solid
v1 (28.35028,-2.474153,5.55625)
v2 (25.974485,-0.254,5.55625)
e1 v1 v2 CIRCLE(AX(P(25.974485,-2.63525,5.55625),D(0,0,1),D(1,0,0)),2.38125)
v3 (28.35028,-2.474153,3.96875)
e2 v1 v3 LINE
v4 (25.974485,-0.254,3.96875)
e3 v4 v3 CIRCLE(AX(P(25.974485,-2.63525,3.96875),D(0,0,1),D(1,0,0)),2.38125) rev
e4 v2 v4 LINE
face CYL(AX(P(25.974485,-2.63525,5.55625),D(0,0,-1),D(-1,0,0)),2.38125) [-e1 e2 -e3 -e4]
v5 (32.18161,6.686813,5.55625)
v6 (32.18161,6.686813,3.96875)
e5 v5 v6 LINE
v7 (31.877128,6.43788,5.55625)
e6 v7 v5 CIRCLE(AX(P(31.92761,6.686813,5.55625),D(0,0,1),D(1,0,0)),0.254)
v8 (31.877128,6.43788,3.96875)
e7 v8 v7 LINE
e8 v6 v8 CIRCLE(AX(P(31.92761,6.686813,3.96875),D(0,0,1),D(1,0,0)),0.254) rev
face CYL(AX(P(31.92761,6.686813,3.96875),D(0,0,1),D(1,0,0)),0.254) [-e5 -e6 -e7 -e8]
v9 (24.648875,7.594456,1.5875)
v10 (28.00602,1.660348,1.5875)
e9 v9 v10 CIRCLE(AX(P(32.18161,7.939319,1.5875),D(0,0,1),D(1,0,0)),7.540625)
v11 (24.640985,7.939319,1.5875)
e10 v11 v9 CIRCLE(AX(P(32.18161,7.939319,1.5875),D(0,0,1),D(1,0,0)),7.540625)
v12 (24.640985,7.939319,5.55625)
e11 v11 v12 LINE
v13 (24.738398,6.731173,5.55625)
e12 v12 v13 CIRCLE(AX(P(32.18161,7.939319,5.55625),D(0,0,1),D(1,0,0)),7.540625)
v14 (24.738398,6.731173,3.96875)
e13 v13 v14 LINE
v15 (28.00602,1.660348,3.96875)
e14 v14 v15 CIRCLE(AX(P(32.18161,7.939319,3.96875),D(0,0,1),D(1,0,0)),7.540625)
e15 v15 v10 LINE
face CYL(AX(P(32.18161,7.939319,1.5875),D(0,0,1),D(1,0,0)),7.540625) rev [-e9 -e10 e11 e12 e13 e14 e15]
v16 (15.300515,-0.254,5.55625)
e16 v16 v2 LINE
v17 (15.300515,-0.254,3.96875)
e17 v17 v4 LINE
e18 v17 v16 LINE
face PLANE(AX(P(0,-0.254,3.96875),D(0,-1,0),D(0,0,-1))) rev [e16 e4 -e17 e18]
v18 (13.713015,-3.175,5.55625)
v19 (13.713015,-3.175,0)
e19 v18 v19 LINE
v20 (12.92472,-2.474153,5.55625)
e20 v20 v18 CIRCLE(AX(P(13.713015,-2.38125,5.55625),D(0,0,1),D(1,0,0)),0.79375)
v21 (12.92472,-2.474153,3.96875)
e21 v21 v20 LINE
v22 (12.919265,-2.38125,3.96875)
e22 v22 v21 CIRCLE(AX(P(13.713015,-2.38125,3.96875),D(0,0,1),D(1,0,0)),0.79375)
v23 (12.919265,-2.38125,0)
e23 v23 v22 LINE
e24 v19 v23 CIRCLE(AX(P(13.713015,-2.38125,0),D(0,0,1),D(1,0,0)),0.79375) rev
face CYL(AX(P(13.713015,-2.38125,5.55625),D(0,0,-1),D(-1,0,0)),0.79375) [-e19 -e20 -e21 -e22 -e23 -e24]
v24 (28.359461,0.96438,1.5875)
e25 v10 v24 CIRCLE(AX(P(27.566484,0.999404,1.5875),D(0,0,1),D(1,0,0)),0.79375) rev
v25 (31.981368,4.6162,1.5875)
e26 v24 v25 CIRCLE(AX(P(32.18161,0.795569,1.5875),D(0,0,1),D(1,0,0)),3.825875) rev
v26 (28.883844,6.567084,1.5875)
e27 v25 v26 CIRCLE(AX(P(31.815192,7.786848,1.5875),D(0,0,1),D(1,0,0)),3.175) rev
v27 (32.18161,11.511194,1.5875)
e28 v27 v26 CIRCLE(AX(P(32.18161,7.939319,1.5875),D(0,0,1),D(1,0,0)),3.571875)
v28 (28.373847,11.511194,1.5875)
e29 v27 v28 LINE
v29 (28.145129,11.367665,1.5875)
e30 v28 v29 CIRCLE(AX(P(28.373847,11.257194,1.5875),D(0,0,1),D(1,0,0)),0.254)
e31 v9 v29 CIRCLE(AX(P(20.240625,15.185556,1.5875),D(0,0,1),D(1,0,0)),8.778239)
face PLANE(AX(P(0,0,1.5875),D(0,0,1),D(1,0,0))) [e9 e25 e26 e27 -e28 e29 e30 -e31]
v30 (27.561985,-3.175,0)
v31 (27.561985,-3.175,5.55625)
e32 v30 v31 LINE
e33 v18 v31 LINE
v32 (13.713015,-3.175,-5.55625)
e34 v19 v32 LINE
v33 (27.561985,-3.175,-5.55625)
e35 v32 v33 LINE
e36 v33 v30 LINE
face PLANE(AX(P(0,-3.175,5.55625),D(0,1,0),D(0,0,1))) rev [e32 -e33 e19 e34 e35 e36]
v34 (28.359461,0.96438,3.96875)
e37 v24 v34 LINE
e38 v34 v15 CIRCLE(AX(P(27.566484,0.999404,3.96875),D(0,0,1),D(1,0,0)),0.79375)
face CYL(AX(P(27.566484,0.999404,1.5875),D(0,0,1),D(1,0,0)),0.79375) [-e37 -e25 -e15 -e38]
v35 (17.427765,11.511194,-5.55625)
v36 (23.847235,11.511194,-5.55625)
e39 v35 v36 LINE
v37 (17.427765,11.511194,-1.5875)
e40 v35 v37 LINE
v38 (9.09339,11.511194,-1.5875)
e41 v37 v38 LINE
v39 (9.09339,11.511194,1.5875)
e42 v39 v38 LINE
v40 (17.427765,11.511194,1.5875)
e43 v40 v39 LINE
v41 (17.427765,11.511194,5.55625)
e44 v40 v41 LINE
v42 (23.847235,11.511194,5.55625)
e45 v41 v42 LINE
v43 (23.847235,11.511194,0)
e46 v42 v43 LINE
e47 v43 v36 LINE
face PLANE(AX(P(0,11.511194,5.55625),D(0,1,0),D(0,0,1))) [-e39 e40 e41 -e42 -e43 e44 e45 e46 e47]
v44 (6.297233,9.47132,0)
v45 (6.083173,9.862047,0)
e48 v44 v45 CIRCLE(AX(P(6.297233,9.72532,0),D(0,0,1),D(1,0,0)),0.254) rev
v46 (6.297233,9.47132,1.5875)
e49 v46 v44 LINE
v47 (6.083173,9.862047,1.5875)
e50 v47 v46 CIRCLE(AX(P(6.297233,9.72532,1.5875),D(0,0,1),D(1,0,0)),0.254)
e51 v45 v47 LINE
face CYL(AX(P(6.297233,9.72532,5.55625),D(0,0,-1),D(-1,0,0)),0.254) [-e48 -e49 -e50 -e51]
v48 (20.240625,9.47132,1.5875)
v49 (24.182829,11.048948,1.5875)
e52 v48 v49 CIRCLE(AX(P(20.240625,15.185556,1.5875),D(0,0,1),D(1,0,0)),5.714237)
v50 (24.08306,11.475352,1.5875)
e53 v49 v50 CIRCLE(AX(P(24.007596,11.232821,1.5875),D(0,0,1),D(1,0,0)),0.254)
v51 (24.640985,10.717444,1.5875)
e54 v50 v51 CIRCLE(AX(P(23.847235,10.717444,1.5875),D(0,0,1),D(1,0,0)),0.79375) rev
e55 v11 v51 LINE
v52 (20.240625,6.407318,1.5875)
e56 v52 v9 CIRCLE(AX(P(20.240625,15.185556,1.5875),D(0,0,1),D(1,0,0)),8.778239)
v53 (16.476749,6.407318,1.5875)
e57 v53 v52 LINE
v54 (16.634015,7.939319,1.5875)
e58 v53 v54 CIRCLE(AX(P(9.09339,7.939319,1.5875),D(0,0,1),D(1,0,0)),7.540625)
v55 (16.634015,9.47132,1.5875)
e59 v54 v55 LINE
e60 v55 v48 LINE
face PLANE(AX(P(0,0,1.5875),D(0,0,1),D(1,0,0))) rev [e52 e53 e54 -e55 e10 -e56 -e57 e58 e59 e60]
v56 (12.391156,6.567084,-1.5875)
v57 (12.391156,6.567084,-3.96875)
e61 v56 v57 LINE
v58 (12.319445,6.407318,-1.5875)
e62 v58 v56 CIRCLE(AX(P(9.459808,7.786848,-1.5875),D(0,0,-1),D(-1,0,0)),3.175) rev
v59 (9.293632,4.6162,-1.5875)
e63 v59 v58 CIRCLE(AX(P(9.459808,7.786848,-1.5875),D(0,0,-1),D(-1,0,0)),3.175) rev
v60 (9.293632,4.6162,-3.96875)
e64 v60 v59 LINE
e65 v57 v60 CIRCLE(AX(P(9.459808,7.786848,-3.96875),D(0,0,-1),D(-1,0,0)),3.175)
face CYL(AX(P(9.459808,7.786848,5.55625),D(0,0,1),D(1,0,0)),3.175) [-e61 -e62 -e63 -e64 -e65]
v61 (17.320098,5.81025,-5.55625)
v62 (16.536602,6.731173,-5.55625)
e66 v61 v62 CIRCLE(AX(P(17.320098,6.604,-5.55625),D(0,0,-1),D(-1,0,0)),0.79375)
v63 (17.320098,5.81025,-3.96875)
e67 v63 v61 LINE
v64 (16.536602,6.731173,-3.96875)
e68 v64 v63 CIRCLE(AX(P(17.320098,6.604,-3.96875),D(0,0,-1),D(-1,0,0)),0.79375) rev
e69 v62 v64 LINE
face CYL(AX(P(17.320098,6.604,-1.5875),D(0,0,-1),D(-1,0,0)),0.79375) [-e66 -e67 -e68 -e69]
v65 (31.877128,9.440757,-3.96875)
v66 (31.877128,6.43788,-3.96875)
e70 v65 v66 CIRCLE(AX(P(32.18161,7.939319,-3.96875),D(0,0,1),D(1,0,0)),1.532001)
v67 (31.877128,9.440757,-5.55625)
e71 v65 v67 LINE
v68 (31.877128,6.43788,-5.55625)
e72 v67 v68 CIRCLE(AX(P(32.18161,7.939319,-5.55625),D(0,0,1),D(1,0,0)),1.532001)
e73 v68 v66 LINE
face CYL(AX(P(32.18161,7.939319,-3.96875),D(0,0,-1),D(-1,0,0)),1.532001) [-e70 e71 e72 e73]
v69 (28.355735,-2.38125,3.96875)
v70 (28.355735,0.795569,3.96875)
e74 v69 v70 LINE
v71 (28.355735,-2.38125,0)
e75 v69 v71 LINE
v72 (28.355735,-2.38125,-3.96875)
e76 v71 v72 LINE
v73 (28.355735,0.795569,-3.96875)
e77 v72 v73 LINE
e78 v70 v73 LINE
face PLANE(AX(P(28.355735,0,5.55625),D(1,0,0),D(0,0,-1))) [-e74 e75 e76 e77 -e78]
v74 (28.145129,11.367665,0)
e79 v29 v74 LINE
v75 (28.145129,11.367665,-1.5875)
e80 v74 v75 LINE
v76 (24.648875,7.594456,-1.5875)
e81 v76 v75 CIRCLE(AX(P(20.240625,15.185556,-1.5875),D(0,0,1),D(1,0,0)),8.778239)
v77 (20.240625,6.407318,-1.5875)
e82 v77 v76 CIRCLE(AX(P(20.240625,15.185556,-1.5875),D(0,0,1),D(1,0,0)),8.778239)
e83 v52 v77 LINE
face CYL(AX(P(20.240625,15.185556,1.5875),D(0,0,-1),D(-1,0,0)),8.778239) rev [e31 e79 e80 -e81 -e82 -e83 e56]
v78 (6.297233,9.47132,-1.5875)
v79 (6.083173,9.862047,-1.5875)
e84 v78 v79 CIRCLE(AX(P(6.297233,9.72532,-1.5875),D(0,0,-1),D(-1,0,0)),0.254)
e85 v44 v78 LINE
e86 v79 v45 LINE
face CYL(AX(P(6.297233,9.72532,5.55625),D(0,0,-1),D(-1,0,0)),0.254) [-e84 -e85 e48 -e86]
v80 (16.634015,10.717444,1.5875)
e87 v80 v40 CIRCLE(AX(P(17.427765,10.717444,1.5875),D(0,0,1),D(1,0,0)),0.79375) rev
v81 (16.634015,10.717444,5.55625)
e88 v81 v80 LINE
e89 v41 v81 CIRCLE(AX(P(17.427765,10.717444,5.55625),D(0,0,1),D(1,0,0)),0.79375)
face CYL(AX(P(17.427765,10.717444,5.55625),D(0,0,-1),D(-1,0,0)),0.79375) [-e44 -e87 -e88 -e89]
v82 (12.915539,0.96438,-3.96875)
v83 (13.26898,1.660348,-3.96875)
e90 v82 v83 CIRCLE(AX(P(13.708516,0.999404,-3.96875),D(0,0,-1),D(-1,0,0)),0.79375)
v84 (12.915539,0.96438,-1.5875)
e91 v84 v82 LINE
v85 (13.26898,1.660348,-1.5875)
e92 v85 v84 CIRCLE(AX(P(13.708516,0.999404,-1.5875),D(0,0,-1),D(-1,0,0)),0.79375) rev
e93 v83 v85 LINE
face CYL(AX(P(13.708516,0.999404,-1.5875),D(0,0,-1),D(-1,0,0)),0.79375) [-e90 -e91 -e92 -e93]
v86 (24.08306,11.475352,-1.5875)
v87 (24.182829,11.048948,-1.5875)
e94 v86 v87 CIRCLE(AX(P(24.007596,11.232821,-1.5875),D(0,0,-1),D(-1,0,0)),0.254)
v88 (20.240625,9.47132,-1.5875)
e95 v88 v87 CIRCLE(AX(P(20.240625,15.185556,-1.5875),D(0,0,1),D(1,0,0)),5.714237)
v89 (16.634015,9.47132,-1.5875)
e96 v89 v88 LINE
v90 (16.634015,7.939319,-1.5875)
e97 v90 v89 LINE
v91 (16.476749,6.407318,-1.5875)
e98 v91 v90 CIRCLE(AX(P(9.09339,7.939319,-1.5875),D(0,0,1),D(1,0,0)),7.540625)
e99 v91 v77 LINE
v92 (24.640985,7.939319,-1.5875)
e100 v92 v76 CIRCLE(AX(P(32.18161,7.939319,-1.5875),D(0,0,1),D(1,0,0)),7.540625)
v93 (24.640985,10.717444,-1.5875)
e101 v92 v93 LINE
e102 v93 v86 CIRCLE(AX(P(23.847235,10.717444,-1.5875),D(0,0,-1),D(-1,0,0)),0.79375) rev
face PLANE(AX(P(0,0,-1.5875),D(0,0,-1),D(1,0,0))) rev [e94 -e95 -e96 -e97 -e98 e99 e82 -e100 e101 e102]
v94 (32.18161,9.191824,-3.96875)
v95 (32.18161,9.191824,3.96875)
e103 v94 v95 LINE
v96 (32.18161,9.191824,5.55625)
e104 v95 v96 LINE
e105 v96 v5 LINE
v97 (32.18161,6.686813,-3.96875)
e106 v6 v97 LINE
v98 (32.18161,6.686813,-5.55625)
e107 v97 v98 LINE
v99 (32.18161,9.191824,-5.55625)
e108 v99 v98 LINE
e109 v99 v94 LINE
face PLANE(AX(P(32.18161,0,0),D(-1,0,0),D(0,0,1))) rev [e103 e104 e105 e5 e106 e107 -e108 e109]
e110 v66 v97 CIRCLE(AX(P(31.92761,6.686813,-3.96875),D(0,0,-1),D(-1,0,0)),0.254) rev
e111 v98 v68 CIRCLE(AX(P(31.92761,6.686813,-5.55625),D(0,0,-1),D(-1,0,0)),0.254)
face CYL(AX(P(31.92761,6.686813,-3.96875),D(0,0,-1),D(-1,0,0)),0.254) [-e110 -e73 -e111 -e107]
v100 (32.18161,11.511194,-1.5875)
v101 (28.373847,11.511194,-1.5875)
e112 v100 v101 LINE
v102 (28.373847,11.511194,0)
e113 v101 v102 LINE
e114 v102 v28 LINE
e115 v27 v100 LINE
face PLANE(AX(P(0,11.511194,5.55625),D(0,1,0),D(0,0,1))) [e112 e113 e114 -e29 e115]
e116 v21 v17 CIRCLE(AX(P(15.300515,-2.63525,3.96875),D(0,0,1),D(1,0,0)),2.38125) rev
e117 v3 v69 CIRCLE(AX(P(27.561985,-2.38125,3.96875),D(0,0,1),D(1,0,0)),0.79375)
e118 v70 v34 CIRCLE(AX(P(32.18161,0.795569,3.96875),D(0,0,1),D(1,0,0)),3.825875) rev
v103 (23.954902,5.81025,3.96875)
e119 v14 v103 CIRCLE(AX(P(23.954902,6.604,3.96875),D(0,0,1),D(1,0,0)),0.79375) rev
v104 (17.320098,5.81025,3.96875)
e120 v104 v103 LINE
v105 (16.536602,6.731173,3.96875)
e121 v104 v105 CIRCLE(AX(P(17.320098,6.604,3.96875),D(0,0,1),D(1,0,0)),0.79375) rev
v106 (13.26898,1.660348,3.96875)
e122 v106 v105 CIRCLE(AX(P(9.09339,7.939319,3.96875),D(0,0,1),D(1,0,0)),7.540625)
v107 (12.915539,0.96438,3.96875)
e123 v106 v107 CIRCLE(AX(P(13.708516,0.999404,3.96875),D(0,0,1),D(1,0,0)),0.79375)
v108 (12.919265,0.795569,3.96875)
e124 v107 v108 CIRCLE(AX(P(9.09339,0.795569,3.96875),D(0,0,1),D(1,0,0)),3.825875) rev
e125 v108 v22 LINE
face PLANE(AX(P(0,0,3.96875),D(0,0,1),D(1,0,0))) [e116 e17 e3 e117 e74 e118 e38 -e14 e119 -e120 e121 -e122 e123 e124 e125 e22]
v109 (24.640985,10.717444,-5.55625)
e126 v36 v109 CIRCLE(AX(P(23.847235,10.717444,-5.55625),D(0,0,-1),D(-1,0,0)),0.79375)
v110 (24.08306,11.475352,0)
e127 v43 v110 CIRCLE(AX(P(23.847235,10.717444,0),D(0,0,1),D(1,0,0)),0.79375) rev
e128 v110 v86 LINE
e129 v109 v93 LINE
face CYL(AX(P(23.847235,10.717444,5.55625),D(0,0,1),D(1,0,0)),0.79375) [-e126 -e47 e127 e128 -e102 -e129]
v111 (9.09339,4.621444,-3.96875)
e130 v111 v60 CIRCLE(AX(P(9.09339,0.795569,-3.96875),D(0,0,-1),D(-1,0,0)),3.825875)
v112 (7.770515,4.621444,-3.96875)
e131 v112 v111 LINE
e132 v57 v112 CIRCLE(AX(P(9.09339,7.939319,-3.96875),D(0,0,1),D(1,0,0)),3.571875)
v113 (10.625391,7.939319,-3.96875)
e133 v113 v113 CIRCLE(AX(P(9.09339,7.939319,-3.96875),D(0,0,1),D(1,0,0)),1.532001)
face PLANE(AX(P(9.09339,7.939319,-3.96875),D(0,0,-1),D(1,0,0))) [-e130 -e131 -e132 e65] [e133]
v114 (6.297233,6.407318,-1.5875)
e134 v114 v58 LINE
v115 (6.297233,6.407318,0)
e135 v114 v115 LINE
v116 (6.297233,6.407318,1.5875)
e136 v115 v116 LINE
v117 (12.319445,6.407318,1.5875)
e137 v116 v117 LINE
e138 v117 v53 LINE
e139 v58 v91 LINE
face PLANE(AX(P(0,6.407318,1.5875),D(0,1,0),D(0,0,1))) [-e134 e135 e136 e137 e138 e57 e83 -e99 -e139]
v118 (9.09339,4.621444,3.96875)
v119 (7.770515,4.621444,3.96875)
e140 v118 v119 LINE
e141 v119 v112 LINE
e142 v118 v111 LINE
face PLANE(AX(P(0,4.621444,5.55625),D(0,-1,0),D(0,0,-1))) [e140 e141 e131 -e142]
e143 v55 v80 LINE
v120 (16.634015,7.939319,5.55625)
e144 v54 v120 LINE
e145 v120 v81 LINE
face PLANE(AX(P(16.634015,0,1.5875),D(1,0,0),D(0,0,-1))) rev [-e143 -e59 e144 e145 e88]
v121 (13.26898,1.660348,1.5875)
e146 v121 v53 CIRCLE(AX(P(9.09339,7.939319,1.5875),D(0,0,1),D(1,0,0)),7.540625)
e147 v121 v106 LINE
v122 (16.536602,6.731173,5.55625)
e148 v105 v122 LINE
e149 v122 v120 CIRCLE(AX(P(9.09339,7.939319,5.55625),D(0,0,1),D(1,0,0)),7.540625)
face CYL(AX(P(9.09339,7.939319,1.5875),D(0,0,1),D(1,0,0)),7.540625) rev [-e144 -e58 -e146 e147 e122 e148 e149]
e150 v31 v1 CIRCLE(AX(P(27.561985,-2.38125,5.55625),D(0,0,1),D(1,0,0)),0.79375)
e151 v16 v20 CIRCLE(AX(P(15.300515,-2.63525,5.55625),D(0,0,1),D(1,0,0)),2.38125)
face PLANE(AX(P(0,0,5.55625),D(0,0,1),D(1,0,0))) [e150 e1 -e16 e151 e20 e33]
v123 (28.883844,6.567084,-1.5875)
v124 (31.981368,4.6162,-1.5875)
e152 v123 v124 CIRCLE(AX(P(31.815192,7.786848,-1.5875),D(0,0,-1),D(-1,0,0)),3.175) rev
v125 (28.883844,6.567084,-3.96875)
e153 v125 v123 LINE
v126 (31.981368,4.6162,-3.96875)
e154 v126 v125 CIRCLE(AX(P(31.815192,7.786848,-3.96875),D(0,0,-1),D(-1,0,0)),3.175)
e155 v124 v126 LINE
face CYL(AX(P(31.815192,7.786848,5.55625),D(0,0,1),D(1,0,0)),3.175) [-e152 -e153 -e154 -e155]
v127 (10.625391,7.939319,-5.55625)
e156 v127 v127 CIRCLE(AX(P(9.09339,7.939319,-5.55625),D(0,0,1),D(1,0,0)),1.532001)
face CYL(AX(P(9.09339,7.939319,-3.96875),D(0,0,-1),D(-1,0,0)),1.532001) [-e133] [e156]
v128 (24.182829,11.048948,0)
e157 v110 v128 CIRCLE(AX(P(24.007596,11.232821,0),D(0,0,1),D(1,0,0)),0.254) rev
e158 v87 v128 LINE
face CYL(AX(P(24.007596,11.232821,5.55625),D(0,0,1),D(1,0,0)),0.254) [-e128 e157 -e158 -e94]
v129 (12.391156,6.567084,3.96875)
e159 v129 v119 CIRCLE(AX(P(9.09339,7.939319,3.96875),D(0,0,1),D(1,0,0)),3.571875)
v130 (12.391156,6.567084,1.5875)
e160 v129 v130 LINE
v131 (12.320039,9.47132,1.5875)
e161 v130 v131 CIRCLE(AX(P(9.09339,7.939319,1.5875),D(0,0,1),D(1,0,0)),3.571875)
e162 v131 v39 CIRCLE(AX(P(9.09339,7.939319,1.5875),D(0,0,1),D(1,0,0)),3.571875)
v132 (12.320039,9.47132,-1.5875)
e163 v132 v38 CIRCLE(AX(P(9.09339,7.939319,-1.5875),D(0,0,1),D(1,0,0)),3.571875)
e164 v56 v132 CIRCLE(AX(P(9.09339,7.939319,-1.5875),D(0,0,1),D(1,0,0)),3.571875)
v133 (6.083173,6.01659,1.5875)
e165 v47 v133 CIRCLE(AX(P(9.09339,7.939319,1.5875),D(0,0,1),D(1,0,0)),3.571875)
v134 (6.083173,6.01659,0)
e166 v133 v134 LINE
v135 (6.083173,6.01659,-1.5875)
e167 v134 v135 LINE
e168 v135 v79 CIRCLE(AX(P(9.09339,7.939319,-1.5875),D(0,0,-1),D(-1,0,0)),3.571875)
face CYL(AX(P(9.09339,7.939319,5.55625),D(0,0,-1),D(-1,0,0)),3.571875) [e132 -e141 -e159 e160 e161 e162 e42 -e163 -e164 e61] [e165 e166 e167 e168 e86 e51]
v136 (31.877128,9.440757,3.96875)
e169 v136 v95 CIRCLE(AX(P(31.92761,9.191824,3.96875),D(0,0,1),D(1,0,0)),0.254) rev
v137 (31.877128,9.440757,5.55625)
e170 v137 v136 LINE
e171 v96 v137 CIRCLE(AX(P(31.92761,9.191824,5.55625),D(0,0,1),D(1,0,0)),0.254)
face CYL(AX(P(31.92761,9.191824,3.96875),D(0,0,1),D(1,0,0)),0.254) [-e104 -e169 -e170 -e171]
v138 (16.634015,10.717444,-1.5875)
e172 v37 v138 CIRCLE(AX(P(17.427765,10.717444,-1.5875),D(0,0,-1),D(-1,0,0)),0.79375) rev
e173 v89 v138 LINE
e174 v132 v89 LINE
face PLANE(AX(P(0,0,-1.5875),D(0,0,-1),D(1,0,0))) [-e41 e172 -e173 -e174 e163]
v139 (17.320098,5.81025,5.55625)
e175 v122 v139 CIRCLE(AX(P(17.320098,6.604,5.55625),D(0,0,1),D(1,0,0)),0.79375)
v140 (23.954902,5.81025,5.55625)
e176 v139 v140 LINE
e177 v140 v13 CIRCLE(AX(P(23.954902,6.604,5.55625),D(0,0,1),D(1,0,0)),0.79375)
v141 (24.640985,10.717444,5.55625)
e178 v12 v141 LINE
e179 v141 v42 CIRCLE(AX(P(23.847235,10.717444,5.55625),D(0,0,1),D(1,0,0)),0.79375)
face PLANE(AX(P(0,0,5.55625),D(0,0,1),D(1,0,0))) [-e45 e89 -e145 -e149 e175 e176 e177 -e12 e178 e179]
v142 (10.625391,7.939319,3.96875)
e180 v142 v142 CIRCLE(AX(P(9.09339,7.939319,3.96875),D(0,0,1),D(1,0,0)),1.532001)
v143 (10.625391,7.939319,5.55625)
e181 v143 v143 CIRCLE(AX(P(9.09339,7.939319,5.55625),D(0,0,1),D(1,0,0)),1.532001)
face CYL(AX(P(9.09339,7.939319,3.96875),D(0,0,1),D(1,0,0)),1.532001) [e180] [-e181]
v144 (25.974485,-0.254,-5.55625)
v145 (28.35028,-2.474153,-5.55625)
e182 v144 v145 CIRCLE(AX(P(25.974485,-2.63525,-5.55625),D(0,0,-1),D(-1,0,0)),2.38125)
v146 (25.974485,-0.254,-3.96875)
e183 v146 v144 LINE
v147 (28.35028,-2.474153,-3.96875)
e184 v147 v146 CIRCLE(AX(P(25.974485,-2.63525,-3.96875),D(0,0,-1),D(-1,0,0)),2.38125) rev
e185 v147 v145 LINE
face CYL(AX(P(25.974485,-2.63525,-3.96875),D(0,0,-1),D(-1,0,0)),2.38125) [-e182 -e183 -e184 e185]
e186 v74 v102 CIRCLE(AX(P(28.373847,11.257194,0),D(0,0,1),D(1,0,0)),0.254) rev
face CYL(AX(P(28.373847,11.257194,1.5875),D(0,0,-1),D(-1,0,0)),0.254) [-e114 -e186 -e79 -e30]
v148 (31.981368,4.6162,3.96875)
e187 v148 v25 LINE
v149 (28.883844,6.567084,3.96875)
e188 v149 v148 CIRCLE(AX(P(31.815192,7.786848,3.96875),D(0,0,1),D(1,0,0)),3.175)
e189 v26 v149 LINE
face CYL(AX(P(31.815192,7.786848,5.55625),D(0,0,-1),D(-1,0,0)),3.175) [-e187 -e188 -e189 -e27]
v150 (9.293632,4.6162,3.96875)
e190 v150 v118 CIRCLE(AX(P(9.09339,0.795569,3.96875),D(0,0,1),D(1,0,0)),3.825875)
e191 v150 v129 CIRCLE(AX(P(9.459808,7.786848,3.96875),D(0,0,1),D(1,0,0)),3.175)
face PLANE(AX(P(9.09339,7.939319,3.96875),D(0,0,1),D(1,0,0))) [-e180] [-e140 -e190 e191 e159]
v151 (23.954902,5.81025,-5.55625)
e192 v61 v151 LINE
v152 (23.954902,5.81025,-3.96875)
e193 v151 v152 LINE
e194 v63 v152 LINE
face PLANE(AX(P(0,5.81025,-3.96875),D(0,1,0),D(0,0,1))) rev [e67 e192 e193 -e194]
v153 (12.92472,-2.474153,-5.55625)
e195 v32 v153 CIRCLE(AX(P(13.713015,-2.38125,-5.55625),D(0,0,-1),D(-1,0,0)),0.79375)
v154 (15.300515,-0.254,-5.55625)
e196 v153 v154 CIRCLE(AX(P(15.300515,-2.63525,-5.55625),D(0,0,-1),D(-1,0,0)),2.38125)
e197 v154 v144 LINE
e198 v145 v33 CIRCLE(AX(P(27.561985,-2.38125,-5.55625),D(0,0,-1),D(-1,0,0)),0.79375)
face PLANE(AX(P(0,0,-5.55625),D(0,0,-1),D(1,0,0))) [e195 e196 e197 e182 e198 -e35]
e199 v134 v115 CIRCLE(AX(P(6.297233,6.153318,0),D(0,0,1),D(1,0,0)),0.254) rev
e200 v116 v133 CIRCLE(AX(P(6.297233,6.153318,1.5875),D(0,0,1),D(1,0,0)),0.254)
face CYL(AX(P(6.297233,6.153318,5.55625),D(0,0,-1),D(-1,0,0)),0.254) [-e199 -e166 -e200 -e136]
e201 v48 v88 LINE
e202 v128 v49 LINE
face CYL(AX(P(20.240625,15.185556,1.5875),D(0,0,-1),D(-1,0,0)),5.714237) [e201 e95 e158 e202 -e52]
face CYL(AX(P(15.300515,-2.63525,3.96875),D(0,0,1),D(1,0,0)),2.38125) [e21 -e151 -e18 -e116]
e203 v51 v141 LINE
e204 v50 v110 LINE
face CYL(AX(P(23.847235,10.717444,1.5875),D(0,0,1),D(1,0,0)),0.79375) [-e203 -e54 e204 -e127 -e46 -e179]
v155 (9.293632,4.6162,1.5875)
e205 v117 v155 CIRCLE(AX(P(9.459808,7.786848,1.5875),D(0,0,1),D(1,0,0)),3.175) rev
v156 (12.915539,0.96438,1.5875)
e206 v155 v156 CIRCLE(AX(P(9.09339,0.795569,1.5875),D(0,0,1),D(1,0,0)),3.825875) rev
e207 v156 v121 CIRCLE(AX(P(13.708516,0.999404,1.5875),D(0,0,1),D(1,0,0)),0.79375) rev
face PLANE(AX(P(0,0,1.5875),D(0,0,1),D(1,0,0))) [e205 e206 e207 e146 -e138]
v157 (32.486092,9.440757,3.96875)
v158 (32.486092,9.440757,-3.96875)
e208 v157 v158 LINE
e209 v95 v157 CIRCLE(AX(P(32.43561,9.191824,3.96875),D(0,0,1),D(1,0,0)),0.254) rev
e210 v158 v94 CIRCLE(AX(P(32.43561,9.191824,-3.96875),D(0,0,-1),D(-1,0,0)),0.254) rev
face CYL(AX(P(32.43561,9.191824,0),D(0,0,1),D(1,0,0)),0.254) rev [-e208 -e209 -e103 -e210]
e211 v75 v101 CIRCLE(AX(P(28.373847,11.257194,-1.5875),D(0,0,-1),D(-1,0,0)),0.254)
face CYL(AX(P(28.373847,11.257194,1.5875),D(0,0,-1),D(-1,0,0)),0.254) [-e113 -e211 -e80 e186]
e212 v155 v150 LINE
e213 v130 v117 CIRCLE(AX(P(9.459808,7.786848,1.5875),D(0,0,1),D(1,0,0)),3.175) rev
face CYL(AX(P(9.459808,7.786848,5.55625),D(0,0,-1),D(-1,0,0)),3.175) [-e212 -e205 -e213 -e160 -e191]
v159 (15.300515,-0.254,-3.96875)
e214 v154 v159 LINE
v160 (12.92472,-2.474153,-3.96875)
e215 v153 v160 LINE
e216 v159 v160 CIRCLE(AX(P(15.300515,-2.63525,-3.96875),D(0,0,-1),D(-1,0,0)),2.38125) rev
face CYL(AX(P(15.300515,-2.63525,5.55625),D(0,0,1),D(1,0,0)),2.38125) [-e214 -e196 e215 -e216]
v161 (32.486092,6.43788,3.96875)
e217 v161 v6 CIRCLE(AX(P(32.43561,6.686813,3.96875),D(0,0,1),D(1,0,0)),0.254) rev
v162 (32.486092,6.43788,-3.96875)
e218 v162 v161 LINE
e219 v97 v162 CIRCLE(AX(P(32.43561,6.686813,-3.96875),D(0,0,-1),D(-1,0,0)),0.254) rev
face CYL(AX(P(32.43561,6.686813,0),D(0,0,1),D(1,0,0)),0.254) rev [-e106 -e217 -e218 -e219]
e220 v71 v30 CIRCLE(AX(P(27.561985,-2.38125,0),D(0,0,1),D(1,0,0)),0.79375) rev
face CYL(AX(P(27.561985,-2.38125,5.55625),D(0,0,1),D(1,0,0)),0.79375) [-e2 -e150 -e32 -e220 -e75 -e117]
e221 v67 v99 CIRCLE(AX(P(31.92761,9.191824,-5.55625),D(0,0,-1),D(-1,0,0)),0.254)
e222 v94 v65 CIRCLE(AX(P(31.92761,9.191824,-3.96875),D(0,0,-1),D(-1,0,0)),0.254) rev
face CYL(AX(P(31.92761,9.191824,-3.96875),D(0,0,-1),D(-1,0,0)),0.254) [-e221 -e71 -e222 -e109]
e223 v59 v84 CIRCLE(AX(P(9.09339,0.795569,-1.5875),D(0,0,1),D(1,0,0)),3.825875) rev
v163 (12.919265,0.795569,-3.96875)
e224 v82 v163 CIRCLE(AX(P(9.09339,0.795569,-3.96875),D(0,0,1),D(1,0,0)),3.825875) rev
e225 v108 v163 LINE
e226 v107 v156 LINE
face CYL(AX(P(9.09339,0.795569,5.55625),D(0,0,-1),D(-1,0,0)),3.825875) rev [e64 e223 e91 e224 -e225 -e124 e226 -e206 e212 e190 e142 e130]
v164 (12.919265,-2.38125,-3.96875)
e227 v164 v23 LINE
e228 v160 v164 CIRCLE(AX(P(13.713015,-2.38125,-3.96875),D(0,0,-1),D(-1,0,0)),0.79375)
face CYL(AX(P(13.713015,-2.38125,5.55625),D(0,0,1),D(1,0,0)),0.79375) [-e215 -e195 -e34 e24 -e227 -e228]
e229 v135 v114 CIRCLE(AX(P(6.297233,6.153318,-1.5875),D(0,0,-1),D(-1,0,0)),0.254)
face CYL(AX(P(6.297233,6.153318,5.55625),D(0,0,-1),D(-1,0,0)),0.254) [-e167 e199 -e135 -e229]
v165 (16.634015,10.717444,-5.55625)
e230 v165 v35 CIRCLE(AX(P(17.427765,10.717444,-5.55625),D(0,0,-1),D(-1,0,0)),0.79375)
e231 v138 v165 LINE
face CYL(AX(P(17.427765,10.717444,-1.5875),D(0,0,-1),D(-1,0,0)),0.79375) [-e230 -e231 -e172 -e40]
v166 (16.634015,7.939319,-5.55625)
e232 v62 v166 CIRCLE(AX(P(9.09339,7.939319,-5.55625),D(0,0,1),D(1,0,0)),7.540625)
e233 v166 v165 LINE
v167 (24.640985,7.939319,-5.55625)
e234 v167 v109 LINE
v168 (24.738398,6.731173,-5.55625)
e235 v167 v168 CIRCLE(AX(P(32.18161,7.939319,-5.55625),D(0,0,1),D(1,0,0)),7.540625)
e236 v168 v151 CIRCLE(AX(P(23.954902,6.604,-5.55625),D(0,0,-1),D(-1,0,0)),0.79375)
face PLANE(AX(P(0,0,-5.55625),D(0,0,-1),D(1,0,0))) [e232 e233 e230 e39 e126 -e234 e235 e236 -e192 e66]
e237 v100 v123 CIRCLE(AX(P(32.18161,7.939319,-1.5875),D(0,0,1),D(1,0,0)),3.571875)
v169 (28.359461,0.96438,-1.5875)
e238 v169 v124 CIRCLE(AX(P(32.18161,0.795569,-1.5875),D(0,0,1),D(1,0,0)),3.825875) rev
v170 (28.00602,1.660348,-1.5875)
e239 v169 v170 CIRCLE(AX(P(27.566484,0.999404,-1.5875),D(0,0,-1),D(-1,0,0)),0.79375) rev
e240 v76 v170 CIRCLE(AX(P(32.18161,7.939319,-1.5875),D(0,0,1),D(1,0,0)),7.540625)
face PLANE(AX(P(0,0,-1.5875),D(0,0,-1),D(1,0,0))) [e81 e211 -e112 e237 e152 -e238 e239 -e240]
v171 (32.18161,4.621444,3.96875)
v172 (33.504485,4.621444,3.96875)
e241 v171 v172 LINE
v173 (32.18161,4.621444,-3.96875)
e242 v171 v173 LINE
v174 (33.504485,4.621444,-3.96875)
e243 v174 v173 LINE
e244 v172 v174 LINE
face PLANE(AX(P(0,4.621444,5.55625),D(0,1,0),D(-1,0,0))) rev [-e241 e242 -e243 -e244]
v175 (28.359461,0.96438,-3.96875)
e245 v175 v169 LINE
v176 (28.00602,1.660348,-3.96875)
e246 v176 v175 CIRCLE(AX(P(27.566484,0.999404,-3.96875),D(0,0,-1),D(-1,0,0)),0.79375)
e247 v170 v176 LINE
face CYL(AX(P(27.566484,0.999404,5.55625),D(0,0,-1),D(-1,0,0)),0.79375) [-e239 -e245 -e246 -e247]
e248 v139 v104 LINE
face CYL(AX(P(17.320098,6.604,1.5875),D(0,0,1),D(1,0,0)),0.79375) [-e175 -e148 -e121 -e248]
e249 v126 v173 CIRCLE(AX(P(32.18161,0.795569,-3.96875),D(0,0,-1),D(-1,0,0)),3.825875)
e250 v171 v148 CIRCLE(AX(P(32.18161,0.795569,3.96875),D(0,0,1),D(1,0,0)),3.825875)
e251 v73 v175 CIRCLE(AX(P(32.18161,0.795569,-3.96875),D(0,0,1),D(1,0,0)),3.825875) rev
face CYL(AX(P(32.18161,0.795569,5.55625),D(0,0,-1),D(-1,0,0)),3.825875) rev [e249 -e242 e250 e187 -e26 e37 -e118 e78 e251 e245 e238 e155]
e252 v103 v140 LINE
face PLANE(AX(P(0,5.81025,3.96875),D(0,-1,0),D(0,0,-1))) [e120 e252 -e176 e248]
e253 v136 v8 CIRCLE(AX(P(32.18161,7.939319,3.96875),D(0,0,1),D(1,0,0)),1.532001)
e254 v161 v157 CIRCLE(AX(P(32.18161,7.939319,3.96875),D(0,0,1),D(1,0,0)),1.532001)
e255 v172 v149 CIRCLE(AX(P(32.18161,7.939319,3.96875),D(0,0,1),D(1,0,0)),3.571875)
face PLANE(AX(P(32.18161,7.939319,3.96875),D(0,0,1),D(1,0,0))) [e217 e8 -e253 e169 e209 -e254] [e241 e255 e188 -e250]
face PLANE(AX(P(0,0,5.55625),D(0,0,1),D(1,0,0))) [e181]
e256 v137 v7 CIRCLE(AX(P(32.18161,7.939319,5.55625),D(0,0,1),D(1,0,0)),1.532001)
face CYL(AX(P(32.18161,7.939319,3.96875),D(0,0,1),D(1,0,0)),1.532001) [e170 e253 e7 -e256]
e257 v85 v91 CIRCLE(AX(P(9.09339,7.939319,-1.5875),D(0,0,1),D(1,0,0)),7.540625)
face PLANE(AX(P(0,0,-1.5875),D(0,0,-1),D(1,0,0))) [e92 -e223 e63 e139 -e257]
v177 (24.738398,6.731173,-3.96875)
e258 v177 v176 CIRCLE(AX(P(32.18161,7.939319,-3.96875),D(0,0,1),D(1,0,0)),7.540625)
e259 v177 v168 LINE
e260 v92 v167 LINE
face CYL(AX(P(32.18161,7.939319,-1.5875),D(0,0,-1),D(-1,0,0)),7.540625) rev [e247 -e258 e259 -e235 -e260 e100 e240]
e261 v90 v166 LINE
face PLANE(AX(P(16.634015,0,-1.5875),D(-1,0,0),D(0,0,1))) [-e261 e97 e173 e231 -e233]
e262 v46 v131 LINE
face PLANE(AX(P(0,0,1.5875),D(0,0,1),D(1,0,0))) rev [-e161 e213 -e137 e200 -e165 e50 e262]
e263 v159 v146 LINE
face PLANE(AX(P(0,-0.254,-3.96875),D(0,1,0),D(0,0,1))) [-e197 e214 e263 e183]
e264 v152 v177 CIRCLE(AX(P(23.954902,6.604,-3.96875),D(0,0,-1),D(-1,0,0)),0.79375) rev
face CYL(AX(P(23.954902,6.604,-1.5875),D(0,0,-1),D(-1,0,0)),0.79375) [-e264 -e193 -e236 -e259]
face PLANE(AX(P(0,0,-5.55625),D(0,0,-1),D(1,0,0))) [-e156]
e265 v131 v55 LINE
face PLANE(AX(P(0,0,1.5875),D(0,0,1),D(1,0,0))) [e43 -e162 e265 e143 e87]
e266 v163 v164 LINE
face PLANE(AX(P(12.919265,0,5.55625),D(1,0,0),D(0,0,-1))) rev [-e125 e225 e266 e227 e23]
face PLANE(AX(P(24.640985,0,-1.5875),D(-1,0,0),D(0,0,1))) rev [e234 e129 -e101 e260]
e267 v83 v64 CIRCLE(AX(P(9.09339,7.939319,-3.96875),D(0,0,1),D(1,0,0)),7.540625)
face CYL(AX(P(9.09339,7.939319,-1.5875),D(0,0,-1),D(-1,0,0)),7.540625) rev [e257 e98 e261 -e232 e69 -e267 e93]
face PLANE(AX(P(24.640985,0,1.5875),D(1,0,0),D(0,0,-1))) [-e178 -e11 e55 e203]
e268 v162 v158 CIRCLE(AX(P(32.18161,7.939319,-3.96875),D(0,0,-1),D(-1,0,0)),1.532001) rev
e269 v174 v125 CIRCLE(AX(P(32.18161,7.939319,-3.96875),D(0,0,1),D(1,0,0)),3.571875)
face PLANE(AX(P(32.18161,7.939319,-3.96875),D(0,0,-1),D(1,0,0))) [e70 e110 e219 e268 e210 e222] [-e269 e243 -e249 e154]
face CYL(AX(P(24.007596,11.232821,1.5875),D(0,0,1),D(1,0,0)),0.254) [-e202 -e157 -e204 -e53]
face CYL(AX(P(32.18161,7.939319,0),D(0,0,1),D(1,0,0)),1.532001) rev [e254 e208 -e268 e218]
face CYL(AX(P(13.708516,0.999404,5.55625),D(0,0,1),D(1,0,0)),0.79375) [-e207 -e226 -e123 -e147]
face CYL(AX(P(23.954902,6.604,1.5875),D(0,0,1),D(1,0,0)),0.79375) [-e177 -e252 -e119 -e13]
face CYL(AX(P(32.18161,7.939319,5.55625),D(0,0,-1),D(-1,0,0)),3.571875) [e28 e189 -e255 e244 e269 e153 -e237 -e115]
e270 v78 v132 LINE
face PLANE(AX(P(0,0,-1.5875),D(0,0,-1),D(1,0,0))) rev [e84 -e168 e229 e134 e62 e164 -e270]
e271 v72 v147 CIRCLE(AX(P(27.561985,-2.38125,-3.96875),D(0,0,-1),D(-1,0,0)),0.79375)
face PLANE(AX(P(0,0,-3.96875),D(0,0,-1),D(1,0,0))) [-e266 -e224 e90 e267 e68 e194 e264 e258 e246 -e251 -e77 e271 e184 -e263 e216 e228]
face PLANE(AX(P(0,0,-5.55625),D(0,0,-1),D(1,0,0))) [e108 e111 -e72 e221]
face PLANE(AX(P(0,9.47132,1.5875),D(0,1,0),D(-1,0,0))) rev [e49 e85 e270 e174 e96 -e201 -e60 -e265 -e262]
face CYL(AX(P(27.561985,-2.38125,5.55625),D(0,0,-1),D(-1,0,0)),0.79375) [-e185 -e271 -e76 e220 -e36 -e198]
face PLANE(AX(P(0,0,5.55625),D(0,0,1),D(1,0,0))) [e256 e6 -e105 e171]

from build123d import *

# Parameters (mm, degrees)
BOSS_EXTRUDE1_DEPTH = 5.55625
CUT_EXTRUDE1_DEPTH  = 1.5875
CUT_EXTRUDE3_START  = -1.5875
SKETCH5_R           = 3.571875
SKETCH5_R_2         = 1.532001
CUT_EXTRUDE3_DEPTH  = 1.5875
CUT_EXTRUDE4_START  = -3.96875
CUT_EXTRUDE4_DEPTH  = 3.96875
CUT_EXTRUDE5_DEPTH  = 38.96960889
FILLET1_R           = 3.175
FILLET4_R           = 2.38125
FILLET2_R           = 0.79375
FILLET3_R           = 0.254
FILLET5_R           = 0.254
MIRROR1_START       = -3.96875
MIRROR1_DEPTH       = 3.96875
MIRROR1_START_2     = -5.55625
MIRROR1_2_OUTLINE_R = 1.532001
MIRROR1_2_DEPTH     = 3.96875
MIRROR1_START_3     = -1.5875
MIRROR1_3_DEPTH     = 1.5875
MIRROR1_4_DEPTH     = 2.38125


# Read off the part's stored shape, not the designer's step: Cut-Extrude4, Mirror1
with BuildPart() as part:
    # Sketch2 → Boss-Extrude1 (new body)
    with BuildSketch(Plane.XY):
        with BuildLine():
            Line((32.181610271, 11.511193514), (9.093389729, 11.511193514))
            ThreePointArc((9.093389729, 11.511193514), (5.585589436, 8.612837723), (7.770515396, 4.621443514))
            Line((7.770515396, 4.621443514), (9.093389729, 4.621443514))
            ThreePointArc((9.093389729, 4.621443514), (11.798691885, 3.500870671), (12.919264729, 0.795568514))
            Line((12.919264729, 0.795568514), (12.919264729, -3.175))
            Line((12.919264729, -3.175), (28.355735271, -3.175))
            Line((28.355735271, -3.175), (28.355735271, 0.795568514))
            ThreePointArc((28.355735271, 0.795568514), (29.476308115, 3.500870671), (32.181610271, 4.621443514))
            Line((32.181610271, 4.621443514), (33.504484604, 4.621443514))
            ThreePointArc((33.504484604, 4.621443514), (35.689410564, 8.612837723), (32.181610271, 11.511193514))
        make_face()
    extrude(amount=BOSS_EXTRUDE1_DEPTH)

    # Sketch3 → Cut-Extrude1 (cut)
    with BuildSketch(Plane.XY):
        with BuildLine():
            Line((13.576919222, 9.471319514), (5.521514729, 9.471319514))
            Line((5.521514729, 9.471319514), (5.521514729, 6.407317514))
            Line((5.521514729, 6.407317514), (20.240625, 6.407317514))
            ThreePointArc((20.240625, 6.407317514), (16.573436603, 7.21001835), (13.576919222, 9.471319514))
        make_face()
        with BuildLine():
            Line((20.240625, 9.471319514), (13.576919222, 9.471319514))
            ThreePointArc((13.576919222, 9.471319514), (16.573436603, 7.21001835), (20.240625, 6.407317514))
            ThreePointArc((20.240625, 6.407317514), (24.973649547, 7.792589705), (28.212860271, 11.511193514))
            Line((28.212860271, 11.511193514), (24.616874597, 11.511193514))
            ThreePointArc((24.616874597, 11.511193514), (22.654783573, 10.0063343), (20.240625, 9.471319514))
        make_face()
    extrude(amount=CUT_EXTRUDE1_DEPTH, mode=Mode.SUBTRACT)

    # Sketch5 → Cut-Extrude3 (cut)
    # profile 1 of 3: a face of its own
    with BuildSketch(Plane.XY.offset(5.55625).offset(CUT_EXTRUDE3_START)):
        with BuildLine():
            Line((12.919264729, 0.795568514), (12.919264729, -0.254))
            Line((12.919264729, -0.254), (28.355735271, -0.254))
            Line((28.355735271, -0.254), (28.355735271, 0.795568514))
            ThreePointArc((28.355735271, 0.795568514), (28.368258733, 1.10487348), (28.405747131, 1.412153514))
            ThreePointArc((28.405747131, 1.412153514), (26.253788464, 3.278636804), (24.947794359, 5.81025))
            Line((24.947794359, 5.81025), (16.327205641, 5.81025))
            ThreePointArc((16.327205641, 5.81025), (15.021211536, 3.278636804), (12.869252869, 1.412153514))
            ThreePointArc((12.869252869, 1.412153514), (12.906741267, 1.10487348), (12.919264729, 0.795568514))
        make_face()
    # profile 2 of 3: a face of its own
    with BuildSketch(Plane.XY.offset(5.55625).offset(CUT_EXTRUDE3_START)):
        with Locations((9.093389729, 7.939318514)):
            Circle(SKETCH5_R)
        with Locations((9.093389729, 7.939318514)):
            Circle(SKETCH5_R_2, mode=Mode.SUBTRACT)
    # profile 3 of 3: a face of its own
    with BuildSketch(Plane.XY.offset(5.55625).offset(CUT_EXTRUDE3_START)):
        with Locations((32.181610271, 7.939318514)):
            Circle(SKETCH5_R)
        with Locations((32.181610271, 7.939318514)):
            Circle(SKETCH5_R_2, mode=Mode.SUBTRACT)
    extrude(amount=CUT_EXTRUDE3_DEPTH, mode=Mode.SUBTRACT)

    # Cut-Extrude4 outline → Cut-Extrude4 (cut)
    with BuildSketch(Plane.XY.offset(5.55625).offset(CUT_EXTRUDE4_START)):
        with BuildLine():
            Line((16.634014729, 11.511193514), (9.093389729, 11.511193514))
            ThreePointArc((9.093389729, 11.511193514), (12.632233106, 8.42396123), (10.053711502, 4.49895907))
            ThreePointArc((10.053711502, 4.49895907), (11.9200404, 3.373817047), (12.869252869, 1.412153514))
            ThreePointArc((12.869252869, 1.412153514), (15.625364674, 4.171782357), (16.634014729, 7.939318514))
            Line((16.634014729, 7.939318514), (16.634014729, 11.511193514))
        make_face()
        with BuildLine():
            Line((32.181610271, 11.511193514), (24.640985271, 11.511193514))
            Line((24.640985271, 11.511193514), (24.640985271, 7.939318514))
            ThreePointArc((24.640985271, 7.939318514), (25.649635326, 4.171782357), (28.405747131, 1.412153514))
            ThreePointArc((28.405747131, 1.412153514), (29.3549596, 3.373817047), (31.221288498, 4.49895907))
            ThreePointArc((31.221288498, 4.49895907), (28.642766894, 8.42396123), (32.181610271, 11.511193514))
        make_face()
    extrude(amount=CUT_EXTRUDE4_DEPTH, mode=Mode.SUBTRACT)

    # Sketch5<4> → Cut-Extrude5 (cut, through all)
    with BuildSketch(Plane.XY.offset(5.55625)):
        with BuildLine():
            ThreePointArc((33.713611271, 7.939318514), (33.264898567, 9.02260681), (32.181610271, 9.471319514))
            Line((32.181610271, 9.471319514), (32.181610271, 6.407317514))
            ThreePointArc((32.181610271, 6.407317514), (33.264898567, 6.856030218), (33.713611271, 7.939318514))
        make_face()
    extrude(amount=-CUT_EXTRUDE5_DEPTH, mode=Mode.SUBTRACT)

    # Fillet1
    # the kernel refuses this fillet: 3.175 mm, written as the material it takes off along each edge
    with BuildSketch(Plane(origin=(10.053711502, 4.49895907, 1.5875), x_dir=(-0.98831195882872, 0.15244498035730386, 0), z_dir=(0, 0, 1))) as fillet1_piece_1:
        with BuildLine():
            CenterArc((1.088183894, -3.158922331), FILLET1_R, 95.768471476, 70.407466776)
            ThreePointArc((-1.994849121, -2.400283795), (-1.27345722, -0.97073423), (0, 0))
            ThreePointArc((0, 0), (0.384534192, -0.019373592), (0.769068383, 0))
        make_face()
    extrude(amount=10.183807799, mode=Mode.SUBTRACT)
    with BuildSketch(Plane(origin=(31.221288498, 4.49895907, 1.5875), x_dir=(-0.7489353229830101, 0.6626431030263081, 0), z_dir=(0, 0, 1))) as fillet1_piece_2:
        with BuildLine():
            CenterArc((1.733901733, -2.855962055), FILLET1_R, 64.094468917, 70.407466776)
            ThreePointArc((-0.491561687, -0.591467063), (-0.230881204, -0.308116456), (0, 0))
            ThreePointArc((0, 0), (1.56051156, 0.358917688), (3.12102312, 0))
        make_face()
    extrude(amount=10.183807799, mode=Mode.SUBTRACT)

    # Fillet4
    fillet4_edges = [part.edges().sort_by_distance(p)[0] for p in [
        (28.355735271, -0.254, 4.7625),
        (12.919264729, -0.254, 4.7625),
    ]]
    fillet(fillet4_edges, radius=FILLET4_R)

    # Fillet2
    fillet2_edges = [part.edges().sort_by_distance(p)[0] for p in [
        (24.640985271, 11.511193514, 3.571875),
        (16.634014729, 11.511193514, 3.571875),
        (28.355735271, -3.175, 2.778125),
        (12.919264729, -3.175, 2.778125),
        (16.327205641, 5.81025, 4.7625),
        (24.947794359, 5.81025, 4.7625),
        (28.405747131, 1.412153514, 2.778125),
        (12.869252869, 1.412153514, 2.778125),
    ]]
    fillet(fillet2_edges, radius=FILLET2_R)

    # Fillet3
    fillet3_edges = [part.edges().sort_by_distance(p)[0] for p in [
        (32.181610271, 6.407317514, 1.984375),
        (32.181610271, 9.471319514, 1.984375),
        (24.409605867, 11.277602756, 0.79375),
        (5.8667407, 9.471319514, 0.79375),
        (5.8667407, 6.407317514, 0.79375),
        (28.212860271, 11.511193514, 0.79375),
    ]]
    fillet(fillet3_edges, radius=FILLET3_R)

    # Fillet5
    fillet5_edges = [part.edges().sort_by_distance(p)[0] for p in [
        (32.181610271, 6.407317514, 4.7625),
        (32.181610271, 9.471319514, 4.7625),
    ]]
    fillet(fillet5_edges, radius=FILLET5_R)

    # Mirror1 outline → Mirror1 (add)
    # profile 1 of 5: a face of its own
    with BuildSketch(Plane.XY.offset(MIRROR1_START)):
        with BuildLine():
            ThreePointArc((33.504484604, 4.621443514), (33.5677662, 11.231257572), (28.88384404, 6.567083514))
            ThreePointArc((28.88384404, 6.567083514), (30.123142629, 5.100289827), (31.981367978, 4.616199685))
            ThreePointArc((31.981367978, 4.616199685), (32.0814548, 4.620132332), (32.181610271, 4.621443514))
            Line((32.181610271, 4.621443514), (33.504484604, 4.621443514))
        make_face()
        with BuildLine():
            Line((32.181610271, 6.686812803), (32.181610271, 9.191824225))
            ThreePointArc((32.181610271, 9.191824225), (32.2748409, 9.388469106), (32.486092235, 9.44075709))
            ThreePointArc((32.486092235, 9.44075709), (33.713611271, 7.939318514), (32.486092235, 6.437879938))
            ThreePointArc((32.486092235, 6.437879938), (32.274840901, 6.490167922), (32.181610271, 6.686812803))
        make_face(mode=Mode.SUBTRACT)
    # profile 2 of 5: a face of its own
    with BuildSketch(Plane.XY.offset(MIRROR1_START)):
        with BuildLine():
            Line((7.770515396, 4.621443514), (9.093389729, 4.621443514))
            ThreePointArc((9.093389729, 4.621443514), (9.1935452, 4.620132332), (9.293632022, 4.616199684))
            ThreePointArc((9.293632022, 4.616199684), (11.077123214, 5.054647904), (12.31944467, 6.407317514))
            Line((12.31944467, 6.407317514), (6.297232554, 6.407317514))
            ThreePointArc((6.297232554, 6.407317514), (6.074471756, 6.275356961), (6.083172675, 6.016590165))
            ThreePointArc((6.083172675, 6.016590165), (6.817312229, 5.186544962), (7.770515396, 4.621443514))
        make_face()
    # profile 3 of 5: a face of its own
    with BuildSketch(Plane.XY.offset(MIRROR1_START)):
        with BuildLine():
            ThreePointArc((13.268979766, 1.6603478), (13.000797679, 1.358812007), (12.915538612, 0.964380318))
            ThreePointArc((12.915538612, 0.964380318), (12.918333087, 0.879994975), (12.919264729, 0.795568514))
            Line((12.919264729, 0.795568514), (12.919264729, -2.38125))
            ThreePointArc((12.919264729, -2.38125), (13.151748721, -2.942516008), (13.713014729, -3.175))
            Line((13.713014729, -3.175), (27.561985271, -3.175))
            ThreePointArc((27.561985271, -3.175), (28.123251279, -2.942516008), (28.355735271, -2.38125))
            Line((28.355735271, -2.38125), (28.355735271, 0.795568514))
            ThreePointArc((28.355735271, 0.795568514), (28.356666913, 0.879994975), (28.359461387, 0.964380318))
            ThreePointArc((28.359461387, 0.964380318), (28.274202321, 1.358812007), (28.006020234, 1.6603478))
            ThreePointArc((28.006020234, 1.6603478), (25.618483881, 4.226314694), (24.648875364, 7.59445591))
            ThreePointArc((24.648875364, 7.59445591), (22.523275261, 6.709296274), (20.240625, 6.407317514))
            Line((20.240625, 6.407317514), (16.476749284, 6.407317514))
            ThreePointArc((16.476749284, 6.407317514), (15.341250105, 3.717320634), (13.268979766, 1.6603478))
        make_face()
    # profile 4 of 5: a face of its own
    with BuildSketch(Plane.XY.offset(MIRROR1_START)):
        with BuildLine():
            ThreePointArc((12.320038756, 9.471319514), (9.31672281, 11.504204676), (6.083172675, 9.862046864))
            ThreePointArc((6.083172675, 9.862046864), (6.074471756, 9.603280068), (6.297232554, 9.471319514))
            Line((6.297232554, 9.471319514), (12.320038756, 9.471319514))
        make_face()
    # profile 5 of 5: a face of its own
    with BuildSketch(Plane.XY.offset(MIRROR1_START)):
        with BuildLine():
            Line((16.634014729, 10.717443514), (16.634014729, 9.471319514))
            Line((16.634014729, 9.471319514), (20.240625, 9.471319514))
            ThreePointArc((20.240625, 9.471319514), (22.363705374, 9.880367157), (24.182828792, 11.048947593))
            ThreePointArc((24.182828792, 11.048947593), (24.254916787, 11.290688464), (24.083060366, 11.475352208))
            ThreePointArc((24.083060366, 11.475352208), (23.966501858, 11.502182034), (23.847235271, 11.511193514))
            Line((23.847235271, 11.511193514), (17.427764729, 11.511193514))
            ThreePointArc((17.427764729, 11.511193514), (16.866498721, 11.278709522), (16.634014729, 10.717443514))
        make_face()
    extrude(amount=MIRROR1_DEPTH)

    # Mirror1 2 outline → Mirror1 2 (add)
    with BuildSketch(Plane.XY.offset(MIRROR1_START_2)):
        with BuildLine():
            ThreePointArc((31.877128308, 9.44075709), (30.649609271, 7.939318514), (31.877128308, 6.437879938))
            ThreePointArc((31.877128308, 6.437879938), (32.088379642, 6.490167922), (32.181610271, 6.686812803))
            Line((32.181610271, 6.686812803), (32.181610271, 9.191824225))
            ThreePointArc((32.181610271, 9.191824225), (32.088379643, 9.388469107), (31.877128308, 9.44075709))
        make_face()
        with Locations((9.093389729, 7.939318514)):
            Circle(MIRROR1_2_OUTLINE_R)
        with BuildLine():
            ThreePointArc((16.536602091, 6.731173192), (16.715539288, 6.089658022), (17.320098129, 5.81025))
            Line((17.320098129, 5.81025), (23.954901871, 5.81025))
            ThreePointArc((23.954901871, 5.81025), (24.559460712, 6.089658022), (24.738397909, 6.731173192))
            ThreePointArc((24.738397909, 6.731173192), (24.665377884, 7.333285441), (24.640985271, 7.939318514))
            Line((24.640985271, 7.939318514), (24.640985271, 10.717443514))
            ThreePointArc((24.640985271, 10.717443514), (24.408501279, 11.278709522), (23.847235271, 11.511193514))
            Line((23.847235271, 11.511193514), (17.427764729, 11.511193514))
            ThreePointArc((17.427764729, 11.511193514), (16.866498721, 11.278709522), (16.634014729, 10.717443514))
            Line((16.634014729, 10.717443514), (16.634014729, 7.939318514))
            ThreePointArc((16.634014729, 7.939318514), (16.609622116, 7.333285441), (16.536602091, 6.731173192))
        make_face()
        with BuildLine():
            ThreePointArc((15.300514729, -0.254), (13.674670512, -0.895427553), (12.924720282, -2.47415279))
            ThreePointArc((12.924720282, -2.47415279), (13.185616647, -2.974453444), (13.713014729, -3.175))
            Line((13.713014729, -3.175), (27.561985271, -3.175))
            ThreePointArc((27.561985271, -3.175), (28.089383353, -2.974453444), (28.350279717, -2.47415279))
            ThreePointArc((28.350279717, -2.47415279), (27.600329488, -0.895427553), (25.974485271, -0.254))
            Line((25.974485271, -0.254), (15.300514729, -0.254))
        make_face()
    extrude(amount=MIRROR1_2_DEPTH)

    # Mirror1 3 outline → Mirror1 3 (add)
    with BuildSketch(Plane.XY.offset(MIRROR1_START_3)):
        with BuildLine():
            ThreePointArc((12.31944467, 6.407317514), (11.077123214, 5.054647904), (9.293632022, 4.616199685))
            ThreePointArc((9.293632022, 4.616199685), (11.809794313, 3.489722491), (12.915538613, 0.964380318))
            ThreePointArc((12.915538613, 0.964380318), (13.000797679, 1.358812007), (13.268979766, 1.6603478))
            ThreePointArc((13.268979766, 1.6603478), (15.341250105, 3.717320634), (16.476749284, 6.407317514))
            Line((16.476749284, 6.407317514), (12.31944467, 6.407317514))
        make_face()
        with BuildLine():
            ThreePointArc((9.093389729, 11.511193514), (11.002077097, 10.958458051), (12.320038756, 9.471319514))
            Line((12.320038756, 9.471319514), (16.634014729, 9.471319514))
            Line((16.634014729, 9.471319514), (16.634014729, 10.717443514))
            ThreePointArc((16.634014729, 10.717443514), (16.866498721, 11.278709522), (17.427764729, 11.511193514))
            Line((17.427764729, 11.511193514), (9.093389729, 11.511193514))
        make_face()
        with BuildLine():
            ThreePointArc((28.145128939, 11.367664925), (26.679588907, 9.219215672), (24.648875364, 7.59445591))
            ThreePointArc((24.648875364, 7.59445591), (25.618483881, 4.226314694), (28.006020234, 1.6603478))
            ThreePointArc((28.006020234, 1.6603478), (28.274202321, 1.358812007), (28.359461388, 0.964380318))
            ThreePointArc((28.359461388, 0.964380318), (29.465205687, 3.489722491), (31.981367978, 4.616199684))
            ThreePointArc((31.981367978, 4.616199684), (30.123142629, 5.100289827), (28.88384404, 6.567083514))
            ThreePointArc((28.88384404, 6.567083514), (29.21010031, 9.921342621), (32.181610271, 11.511193514))
            Line((32.181610271, 11.511193514), (28.373847254, 11.511193514))
            ThreePointArc((28.373847254, 11.511193514), (28.238835659, 11.472339672), (28.145128939, 11.367664925))
        make_face()
    extrude(amount=MIRROR1_3_DEPTH)

    # Mirror1 4 outline → Mirror1 4 (add)
    with BuildSketch(Plane.XY.offset(MIRROR1_START)):
        with BuildLine():
            Line((9.093389729, 6.407317514), (12.31944467, 6.407317514))
            ThreePointArc((12.31944467, 6.407317514), (12.356402042, 6.486706002), (12.39115596, 6.567083514))
            ThreePointArc((12.39115596, 6.567083514), (12.664194302, 8.026758252), (12.320038756, 9.471319514))
            Line((12.320038756, 9.471319514), (9.093389729, 9.471319514))
            ThreePointArc((9.093389729, 9.471319514), (10.625390729, 7.939318514), (9.093389729, 6.407317514))
        make_face()
        with BuildLine():
            ThreePointArc((6.083172675, 9.862046864), (5.521514728, 7.939318514), (6.083172675, 6.016590165))
            ThreePointArc((6.083172675, 6.016590165), (6.074471756, 6.275356961), (6.297232554, 6.407317514))
            Line((6.297232554, 6.407317514), (9.093389729, 6.407317514))
            ThreePointArc((9.093389729, 6.407317514), (7.561388729, 7.939318514), (9.093389729, 9.471319514))
            Line((9.093389729, 9.471319514), (6.297232554, 9.471319514))
            ThreePointArc((6.297232554, 9.471319514), (6.074471756, 9.603280068), (6.083172675, 9.862046864))
        make_face()
        with BuildLine():
            ThreePointArc((16.536602091, 6.731173192), (16.508443965, 6.568918552), (16.476749284, 6.407317514))
            Line((16.476749284, 6.407317514), (16.55110199, 6.407317514))
            ThreePointArc((16.55110199, 6.407317514), (16.527142509, 6.568497222), (16.536602091, 6.731173192))
        make_face()
    extrude(amount=MIRROR1_4_DEPTH)


solid = part.part
